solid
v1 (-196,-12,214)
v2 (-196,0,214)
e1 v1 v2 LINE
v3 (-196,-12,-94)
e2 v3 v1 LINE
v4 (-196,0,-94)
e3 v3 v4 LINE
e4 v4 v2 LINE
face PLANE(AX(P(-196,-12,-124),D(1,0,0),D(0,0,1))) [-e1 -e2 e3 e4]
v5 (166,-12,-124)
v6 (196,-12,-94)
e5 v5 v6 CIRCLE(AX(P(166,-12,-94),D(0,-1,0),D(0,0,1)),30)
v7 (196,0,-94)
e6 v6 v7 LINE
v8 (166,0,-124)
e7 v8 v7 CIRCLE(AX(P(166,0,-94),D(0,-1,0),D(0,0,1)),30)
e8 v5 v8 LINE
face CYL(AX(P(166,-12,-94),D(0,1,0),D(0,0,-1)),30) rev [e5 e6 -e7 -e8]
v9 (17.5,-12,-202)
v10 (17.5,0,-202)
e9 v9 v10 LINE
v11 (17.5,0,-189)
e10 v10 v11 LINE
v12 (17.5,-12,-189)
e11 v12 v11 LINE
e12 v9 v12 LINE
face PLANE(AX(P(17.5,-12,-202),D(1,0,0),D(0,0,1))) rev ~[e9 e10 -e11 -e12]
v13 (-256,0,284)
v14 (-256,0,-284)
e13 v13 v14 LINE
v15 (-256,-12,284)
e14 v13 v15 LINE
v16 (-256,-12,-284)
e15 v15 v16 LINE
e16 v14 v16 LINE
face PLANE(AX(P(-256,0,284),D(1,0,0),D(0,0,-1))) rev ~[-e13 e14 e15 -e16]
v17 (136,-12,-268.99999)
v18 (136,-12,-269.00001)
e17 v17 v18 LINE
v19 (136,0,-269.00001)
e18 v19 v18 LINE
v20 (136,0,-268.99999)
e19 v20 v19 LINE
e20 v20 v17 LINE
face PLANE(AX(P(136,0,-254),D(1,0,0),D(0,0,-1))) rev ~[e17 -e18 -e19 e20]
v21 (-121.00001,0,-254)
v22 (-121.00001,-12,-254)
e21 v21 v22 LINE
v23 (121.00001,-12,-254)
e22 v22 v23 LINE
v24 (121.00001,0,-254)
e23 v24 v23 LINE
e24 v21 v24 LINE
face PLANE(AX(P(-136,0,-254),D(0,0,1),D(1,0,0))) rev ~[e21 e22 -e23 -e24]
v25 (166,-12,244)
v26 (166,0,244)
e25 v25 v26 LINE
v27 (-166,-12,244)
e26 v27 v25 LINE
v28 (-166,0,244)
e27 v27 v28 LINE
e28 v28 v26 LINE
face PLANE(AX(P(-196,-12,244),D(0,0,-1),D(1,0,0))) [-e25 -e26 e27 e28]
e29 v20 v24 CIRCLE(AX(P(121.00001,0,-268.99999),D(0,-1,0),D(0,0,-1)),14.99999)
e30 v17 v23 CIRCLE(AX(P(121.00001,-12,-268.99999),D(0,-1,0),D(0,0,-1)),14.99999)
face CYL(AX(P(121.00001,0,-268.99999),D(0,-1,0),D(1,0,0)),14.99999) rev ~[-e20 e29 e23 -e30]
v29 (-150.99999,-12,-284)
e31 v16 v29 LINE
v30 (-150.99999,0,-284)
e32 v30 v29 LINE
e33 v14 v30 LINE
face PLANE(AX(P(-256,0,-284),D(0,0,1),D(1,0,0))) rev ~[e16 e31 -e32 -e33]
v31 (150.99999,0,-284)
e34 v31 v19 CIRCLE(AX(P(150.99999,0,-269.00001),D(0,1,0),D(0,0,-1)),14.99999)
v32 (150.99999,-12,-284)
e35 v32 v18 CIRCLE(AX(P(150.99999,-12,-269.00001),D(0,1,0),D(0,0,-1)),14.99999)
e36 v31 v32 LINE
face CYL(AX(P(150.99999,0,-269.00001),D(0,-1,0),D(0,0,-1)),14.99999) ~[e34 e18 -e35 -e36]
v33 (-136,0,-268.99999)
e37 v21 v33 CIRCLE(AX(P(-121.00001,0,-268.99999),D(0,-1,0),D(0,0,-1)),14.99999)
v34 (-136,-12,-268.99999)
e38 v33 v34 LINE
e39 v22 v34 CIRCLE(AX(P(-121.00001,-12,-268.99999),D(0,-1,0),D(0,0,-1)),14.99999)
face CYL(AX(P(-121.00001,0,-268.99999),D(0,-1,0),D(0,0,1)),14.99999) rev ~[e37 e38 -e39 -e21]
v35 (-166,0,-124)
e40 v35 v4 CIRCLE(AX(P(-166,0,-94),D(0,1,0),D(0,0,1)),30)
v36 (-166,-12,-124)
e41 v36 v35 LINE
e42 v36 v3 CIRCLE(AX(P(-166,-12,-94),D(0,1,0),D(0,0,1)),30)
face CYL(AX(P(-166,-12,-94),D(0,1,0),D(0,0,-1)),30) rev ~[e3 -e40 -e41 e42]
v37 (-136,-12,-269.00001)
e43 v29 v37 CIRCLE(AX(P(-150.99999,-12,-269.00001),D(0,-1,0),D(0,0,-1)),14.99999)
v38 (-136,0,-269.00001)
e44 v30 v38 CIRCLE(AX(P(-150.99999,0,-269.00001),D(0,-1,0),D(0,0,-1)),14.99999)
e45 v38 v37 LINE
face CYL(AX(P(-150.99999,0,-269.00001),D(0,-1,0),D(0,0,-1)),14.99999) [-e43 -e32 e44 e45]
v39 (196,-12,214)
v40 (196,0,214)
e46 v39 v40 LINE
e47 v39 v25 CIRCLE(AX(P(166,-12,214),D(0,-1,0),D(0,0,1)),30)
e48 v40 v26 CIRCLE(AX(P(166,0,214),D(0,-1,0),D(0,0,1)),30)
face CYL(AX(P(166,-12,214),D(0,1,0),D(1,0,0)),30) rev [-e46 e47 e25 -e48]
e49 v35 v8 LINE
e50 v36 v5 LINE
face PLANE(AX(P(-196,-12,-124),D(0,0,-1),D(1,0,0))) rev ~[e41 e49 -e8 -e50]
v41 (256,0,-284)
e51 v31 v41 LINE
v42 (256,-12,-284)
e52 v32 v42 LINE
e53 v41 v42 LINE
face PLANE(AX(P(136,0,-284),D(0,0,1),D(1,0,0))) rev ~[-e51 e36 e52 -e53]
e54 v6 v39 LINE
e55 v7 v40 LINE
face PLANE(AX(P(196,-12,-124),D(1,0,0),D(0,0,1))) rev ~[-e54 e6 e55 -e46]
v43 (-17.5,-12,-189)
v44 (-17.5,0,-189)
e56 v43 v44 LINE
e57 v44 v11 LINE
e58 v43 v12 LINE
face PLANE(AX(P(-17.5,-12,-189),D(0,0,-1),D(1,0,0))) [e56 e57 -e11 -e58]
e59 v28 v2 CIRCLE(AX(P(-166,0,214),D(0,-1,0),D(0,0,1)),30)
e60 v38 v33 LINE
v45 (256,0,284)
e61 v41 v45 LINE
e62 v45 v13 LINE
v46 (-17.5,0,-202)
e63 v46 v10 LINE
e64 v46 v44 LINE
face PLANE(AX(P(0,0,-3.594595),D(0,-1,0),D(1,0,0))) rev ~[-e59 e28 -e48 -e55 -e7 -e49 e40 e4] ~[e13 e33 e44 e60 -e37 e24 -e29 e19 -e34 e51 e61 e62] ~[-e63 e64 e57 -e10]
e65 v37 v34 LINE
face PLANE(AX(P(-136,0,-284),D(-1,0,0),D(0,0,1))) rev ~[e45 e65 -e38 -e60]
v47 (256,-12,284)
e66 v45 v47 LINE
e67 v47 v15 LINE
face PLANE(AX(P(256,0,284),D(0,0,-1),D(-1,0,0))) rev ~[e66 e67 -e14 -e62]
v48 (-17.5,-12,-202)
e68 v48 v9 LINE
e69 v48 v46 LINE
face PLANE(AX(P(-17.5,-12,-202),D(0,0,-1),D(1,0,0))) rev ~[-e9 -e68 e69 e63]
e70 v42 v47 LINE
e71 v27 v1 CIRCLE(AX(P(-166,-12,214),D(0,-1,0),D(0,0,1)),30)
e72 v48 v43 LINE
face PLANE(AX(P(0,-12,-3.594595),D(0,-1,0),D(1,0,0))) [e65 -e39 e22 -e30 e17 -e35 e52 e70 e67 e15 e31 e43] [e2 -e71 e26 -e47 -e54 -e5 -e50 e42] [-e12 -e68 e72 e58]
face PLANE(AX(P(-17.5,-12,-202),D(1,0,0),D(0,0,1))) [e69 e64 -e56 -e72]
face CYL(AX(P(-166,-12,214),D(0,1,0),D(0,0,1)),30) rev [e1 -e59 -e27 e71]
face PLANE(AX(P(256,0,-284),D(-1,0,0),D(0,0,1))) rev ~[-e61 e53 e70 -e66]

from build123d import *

# Parameters (mm, degrees)
F2_DEPTH = 12
F3_W     = 392
F3_H     = 368
F3_W_2   = 35
F3_H_2   = 13
F4_DEPTH = 12
F5_R     = 30
F6_R     = 14.99999


# Not quite as in the source:
# - a fillet or chamfer is up to 0.001 mm smaller than in the source, because OpenCascade refuses the exact size
# - a feature names something its author has since deleted; it is built from what else it names


with BuildPart() as f2:
    # F1 (on Front) → F2 (new body)
    with BuildSketch(Plane.XZ):
        Polygon((256, -284), (256, 284), (-256, 284), (-256, -284), (-136, -284), (-136, -254), (136, -254), (136, -284), align=None)
    extrude(amount=F2_DEPTH)

    # F3 (on face) → F4 (cut, through all)
    with BuildSketch(Plane.XZ.offset(12)):
        with Locations((0, 60)):
            Rectangle(F3_W, F3_H)
        with Locations((0, -195.5)):
            Rectangle(F3_W_2, F3_H_2)
    extrude(amount=-F4_DEPTH, mode=Mode.SUBTRACT)

    # F5
    f5_edges = [f2.edges().sort_by_distance(p)[0] for p in [
        (-196, -6, -124),
        (-196, -6, 244),
        (196, -6, 244),
        (196, -6, -124),
    ]]
    fillet(f5_edges, radius=F5_R)

    # F6 (radius 15 in the source; OpenCascade refuses exactly that, so slightly less here)
    f6_edges = [f2.edges().sort_by_distance(p)[0] for p in [
        (-136, -6, -284),
        (-136, -6, -254),
        (136, -6, -284),
        (136, -6, -254),
    ]]
    fillet(f6_edges, radius=F6_R)


solid = f2.part
